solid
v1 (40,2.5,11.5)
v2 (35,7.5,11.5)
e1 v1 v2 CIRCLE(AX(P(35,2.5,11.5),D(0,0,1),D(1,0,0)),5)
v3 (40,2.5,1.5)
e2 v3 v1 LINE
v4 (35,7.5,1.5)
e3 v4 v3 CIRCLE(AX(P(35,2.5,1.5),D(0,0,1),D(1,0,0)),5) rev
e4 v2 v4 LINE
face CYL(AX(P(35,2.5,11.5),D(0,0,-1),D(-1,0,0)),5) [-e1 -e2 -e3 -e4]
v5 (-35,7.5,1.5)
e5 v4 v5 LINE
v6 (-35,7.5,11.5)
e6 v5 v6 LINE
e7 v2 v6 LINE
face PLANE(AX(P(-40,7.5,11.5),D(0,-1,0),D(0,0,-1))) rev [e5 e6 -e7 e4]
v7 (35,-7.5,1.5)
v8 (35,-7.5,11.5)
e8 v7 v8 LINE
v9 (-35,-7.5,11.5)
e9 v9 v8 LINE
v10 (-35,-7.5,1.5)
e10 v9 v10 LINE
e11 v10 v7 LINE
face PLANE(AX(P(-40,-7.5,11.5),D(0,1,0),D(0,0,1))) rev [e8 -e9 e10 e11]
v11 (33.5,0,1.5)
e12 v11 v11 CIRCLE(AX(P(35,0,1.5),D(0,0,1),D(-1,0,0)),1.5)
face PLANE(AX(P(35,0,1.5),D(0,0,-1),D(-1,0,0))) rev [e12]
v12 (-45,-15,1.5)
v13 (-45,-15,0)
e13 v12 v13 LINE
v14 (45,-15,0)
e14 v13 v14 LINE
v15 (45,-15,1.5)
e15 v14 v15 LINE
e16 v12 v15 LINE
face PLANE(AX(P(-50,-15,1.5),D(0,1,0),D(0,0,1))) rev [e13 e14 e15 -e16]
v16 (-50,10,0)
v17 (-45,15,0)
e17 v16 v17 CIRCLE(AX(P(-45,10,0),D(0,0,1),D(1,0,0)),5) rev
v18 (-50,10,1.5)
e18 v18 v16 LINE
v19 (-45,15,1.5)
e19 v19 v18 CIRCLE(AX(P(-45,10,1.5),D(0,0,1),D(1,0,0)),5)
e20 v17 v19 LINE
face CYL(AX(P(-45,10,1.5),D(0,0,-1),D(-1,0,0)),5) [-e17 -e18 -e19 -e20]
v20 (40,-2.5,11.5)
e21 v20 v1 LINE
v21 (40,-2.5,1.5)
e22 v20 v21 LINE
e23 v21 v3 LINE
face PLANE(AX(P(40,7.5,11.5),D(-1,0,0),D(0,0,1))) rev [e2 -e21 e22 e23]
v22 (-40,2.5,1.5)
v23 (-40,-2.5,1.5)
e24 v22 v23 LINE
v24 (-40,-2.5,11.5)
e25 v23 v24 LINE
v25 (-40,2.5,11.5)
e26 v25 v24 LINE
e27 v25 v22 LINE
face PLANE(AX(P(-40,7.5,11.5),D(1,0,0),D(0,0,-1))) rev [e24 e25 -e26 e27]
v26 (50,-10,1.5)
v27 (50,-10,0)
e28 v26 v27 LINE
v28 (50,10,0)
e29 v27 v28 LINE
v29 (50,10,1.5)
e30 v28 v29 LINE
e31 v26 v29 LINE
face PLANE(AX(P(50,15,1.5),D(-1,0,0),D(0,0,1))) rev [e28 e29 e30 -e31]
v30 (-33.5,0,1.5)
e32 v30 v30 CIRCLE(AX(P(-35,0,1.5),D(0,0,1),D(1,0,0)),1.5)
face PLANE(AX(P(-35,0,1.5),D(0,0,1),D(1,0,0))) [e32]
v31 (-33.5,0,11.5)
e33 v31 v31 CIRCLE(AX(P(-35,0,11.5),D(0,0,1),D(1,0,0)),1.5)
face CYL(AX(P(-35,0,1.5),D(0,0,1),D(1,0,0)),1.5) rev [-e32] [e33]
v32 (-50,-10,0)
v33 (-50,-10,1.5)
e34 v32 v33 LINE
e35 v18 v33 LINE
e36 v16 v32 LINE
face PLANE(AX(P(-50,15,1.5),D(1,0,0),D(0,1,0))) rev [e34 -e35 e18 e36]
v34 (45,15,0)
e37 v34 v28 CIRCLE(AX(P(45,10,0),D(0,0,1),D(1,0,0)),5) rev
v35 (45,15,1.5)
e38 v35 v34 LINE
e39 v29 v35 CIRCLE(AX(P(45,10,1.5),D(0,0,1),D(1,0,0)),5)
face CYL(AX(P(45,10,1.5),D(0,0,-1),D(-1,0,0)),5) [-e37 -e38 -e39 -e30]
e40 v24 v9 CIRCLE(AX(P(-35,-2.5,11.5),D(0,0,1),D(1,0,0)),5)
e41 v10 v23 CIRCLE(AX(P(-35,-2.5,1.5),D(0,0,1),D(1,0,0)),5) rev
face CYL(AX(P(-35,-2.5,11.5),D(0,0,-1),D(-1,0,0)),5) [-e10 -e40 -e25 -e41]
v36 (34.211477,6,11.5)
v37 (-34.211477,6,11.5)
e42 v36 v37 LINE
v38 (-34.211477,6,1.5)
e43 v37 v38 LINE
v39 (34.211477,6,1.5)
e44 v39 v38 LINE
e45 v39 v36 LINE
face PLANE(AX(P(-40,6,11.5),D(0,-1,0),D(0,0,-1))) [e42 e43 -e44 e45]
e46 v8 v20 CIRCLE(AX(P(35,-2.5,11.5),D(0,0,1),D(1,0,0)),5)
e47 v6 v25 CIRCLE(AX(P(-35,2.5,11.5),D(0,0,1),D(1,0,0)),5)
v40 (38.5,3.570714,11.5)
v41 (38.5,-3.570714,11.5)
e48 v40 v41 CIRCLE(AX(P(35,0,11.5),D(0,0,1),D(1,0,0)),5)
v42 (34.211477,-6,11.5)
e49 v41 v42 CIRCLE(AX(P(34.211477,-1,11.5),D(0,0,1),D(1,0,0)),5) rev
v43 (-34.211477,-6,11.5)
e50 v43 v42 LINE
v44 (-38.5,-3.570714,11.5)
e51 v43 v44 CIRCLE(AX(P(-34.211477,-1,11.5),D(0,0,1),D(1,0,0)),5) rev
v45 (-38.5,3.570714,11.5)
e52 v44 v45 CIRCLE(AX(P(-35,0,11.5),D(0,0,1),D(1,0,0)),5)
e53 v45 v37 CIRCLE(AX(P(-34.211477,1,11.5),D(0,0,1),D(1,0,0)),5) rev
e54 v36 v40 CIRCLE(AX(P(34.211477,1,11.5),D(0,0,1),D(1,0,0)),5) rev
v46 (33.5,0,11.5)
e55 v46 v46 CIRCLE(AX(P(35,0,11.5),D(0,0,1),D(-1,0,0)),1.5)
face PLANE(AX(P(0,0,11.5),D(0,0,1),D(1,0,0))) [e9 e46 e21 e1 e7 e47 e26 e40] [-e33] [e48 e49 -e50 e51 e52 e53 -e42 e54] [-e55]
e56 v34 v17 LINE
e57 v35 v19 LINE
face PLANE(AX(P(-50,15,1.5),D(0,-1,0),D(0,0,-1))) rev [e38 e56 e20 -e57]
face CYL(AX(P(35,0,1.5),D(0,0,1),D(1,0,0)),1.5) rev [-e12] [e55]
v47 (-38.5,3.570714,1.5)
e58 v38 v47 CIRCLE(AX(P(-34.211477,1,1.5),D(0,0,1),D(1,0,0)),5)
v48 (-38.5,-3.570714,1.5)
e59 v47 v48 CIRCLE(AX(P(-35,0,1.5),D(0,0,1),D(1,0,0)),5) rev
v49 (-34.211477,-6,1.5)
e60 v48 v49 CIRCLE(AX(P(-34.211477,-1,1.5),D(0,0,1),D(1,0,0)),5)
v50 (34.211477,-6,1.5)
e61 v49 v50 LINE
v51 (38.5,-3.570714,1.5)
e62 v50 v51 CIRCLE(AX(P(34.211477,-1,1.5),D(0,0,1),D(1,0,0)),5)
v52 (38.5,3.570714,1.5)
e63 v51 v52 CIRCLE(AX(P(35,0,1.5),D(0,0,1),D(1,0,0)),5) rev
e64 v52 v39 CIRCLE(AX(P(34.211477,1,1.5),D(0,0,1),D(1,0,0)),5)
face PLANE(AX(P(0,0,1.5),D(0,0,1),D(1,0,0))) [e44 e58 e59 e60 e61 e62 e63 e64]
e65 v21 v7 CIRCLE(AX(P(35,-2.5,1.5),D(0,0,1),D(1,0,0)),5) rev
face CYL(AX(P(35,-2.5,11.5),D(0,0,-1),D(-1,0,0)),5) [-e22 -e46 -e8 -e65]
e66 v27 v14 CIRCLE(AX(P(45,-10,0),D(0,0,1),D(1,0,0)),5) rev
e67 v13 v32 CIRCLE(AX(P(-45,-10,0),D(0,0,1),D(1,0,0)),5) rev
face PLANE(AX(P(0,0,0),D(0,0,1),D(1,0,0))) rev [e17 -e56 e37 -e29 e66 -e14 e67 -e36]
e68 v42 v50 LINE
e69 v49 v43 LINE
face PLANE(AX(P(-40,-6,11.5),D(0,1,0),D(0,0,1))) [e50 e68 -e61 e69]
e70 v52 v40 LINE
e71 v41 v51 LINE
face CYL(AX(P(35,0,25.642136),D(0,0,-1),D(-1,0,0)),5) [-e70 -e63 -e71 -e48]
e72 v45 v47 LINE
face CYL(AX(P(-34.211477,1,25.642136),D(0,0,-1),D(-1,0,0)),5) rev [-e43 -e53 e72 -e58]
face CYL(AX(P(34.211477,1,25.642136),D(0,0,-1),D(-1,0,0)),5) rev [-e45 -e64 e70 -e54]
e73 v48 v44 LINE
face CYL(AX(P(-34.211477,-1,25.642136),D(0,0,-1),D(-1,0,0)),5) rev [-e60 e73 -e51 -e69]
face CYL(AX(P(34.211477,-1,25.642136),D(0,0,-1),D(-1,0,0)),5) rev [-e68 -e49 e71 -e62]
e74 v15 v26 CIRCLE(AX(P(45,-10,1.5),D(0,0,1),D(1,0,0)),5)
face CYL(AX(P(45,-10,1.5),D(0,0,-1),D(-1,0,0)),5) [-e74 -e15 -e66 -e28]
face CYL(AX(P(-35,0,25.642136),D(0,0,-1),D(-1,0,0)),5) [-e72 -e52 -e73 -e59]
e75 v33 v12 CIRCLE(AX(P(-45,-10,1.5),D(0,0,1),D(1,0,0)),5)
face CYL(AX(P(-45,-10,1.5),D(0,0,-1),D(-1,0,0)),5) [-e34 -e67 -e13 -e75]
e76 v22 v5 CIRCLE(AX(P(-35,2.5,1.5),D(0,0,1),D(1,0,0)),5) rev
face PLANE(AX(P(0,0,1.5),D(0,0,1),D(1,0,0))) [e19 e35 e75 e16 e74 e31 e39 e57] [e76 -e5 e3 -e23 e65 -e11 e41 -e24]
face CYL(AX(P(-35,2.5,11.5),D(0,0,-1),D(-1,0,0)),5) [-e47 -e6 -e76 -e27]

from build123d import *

# Parameters (mm, degrees)
SKETCH1_W           = 100
SKETCH1_H           = 30
BOSS_EXTRUDE1_DEPTH = 1.5
SKETCH2_W           = 80
SKETCH2_H           = 15
SKETCH2_W_2         = 77
SKETCH2_H_2         = 12
EXTRUDE_THIN1_DEPTH = 10
SKETCH3_R           = 5
BOSS_EXTRUDE2_DEPTH = 10
SKETCH4_R           = 1.5
CUT_EXTRUDE1_DEPTH  = 10
FILLET1_R           = 5


with BuildPart() as part:
    # Sketch1 → Boss-Extrude1 (new body)
    with BuildSketch(Plane.XY):
        Rectangle(SKETCH1_W, SKETCH1_H)
    extrude(amount=BOSS_EXTRUDE1_DEPTH)

    # Sketch2 → Extrude-Thin1 (add)
    with BuildSketch(Plane.XY.offset(1.5)):
        Rectangle(SKETCH2_W, SKETCH2_H)
        Rectangle(SKETCH2_W_2, SKETCH2_H_2, mode=Mode.SUBTRACT)
    extrude(amount=EXTRUDE_THIN1_DEPTH)

    # Sketch3 → Boss-Extrude2 (add)
    with BuildSketch(Plane.XY.offset(1.5)):
        with Locations((-35, 0)):
            Circle(SKETCH3_R)
        with Locations((35, 0)):
            Circle(SKETCH3_R)
    extrude(amount=BOSS_EXTRUDE2_DEPTH)

    # Sketch4 → Cut-Extrude1 (cut)
    with BuildSketch(Plane.XY.offset(11.5)):
        with Locations((-35, 0)):
            Circle(SKETCH4_R)
        with Locations(Location((35, 0, 0), (0, 0, 180))):
            Circle(SKETCH4_R)
    extrude(amount=-CUT_EXTRUDE1_DEPTH, mode=Mode.SUBTRACT)

    # Fillet1
    # the kernel refuses this fillet: 5 mm, written as the material it adds along each edge
    with BuildSketch(Plane(origin=(38.5, -6, 1.5), x_dir=(0, 1, 0), z_dir=(0, 0, 1))) as fillet1_piece_1:
        with BuildLine():
            CenterArc((5, 4.288522873), FILLET1_R, 180, 59.059821395)
            Line((0, 4.288522873), (0, 0))
            Line((0, 0), (2.429285786, 0))
        make_face()
    extrude(amount=10)
    with BuildSketch(Plane(origin=(38.5, 6, 1.5), x_dir=(0, -1, 0), z_dir=(0, 0, 1))) as fillet1_piece_2:
        with BuildLine():
            CenterArc((5, -4.288522873), FILLET1_R, 120.940178605, 59.059821395)
            Line((0, -4.288522873), (0, 0))
            Line((0, 0), (2.429285786, 0))
        make_face()
    extrude(amount=10)
    with BuildSketch(Plane(origin=(-38.5, -6, 1.5), x_dir=(1, 0, 0), z_dir=(0, 0, 1))) as fillet1_piece_3:
        with BuildLine():
            CenterArc((4.288522873, 5), FILLET1_R, 210.940178605, 59.059821395)
            Line((0, 2.429285786), (0, 0))
            Line((0, 0), (4.288522873, 0))
        make_face()
    extrude(amount=10)
    with BuildSketch(Plane(origin=(-38.5, 6, 1.5), x_dir=(1, 0, 0), z_dir=(0, 0, 1))) as fillet1_piece_4:
        with BuildLine():
            CenterArc((4.288522873, -5), FILLET1_R, 90, 59.059821395)
            Line((0, -2.429285786), (0, 0))
            Line((0, 0), (4.288522873, 0))
        make_face()
    extrude(amount=10)
    # the kernel refuses this fillet: 5 mm, written as the material it takes off along each edge
    with BuildSketch(Plane(origin=(40, 7.5, 1.5), x_dir=(0, -1, 0), z_dir=(0, 0, 1)), Plane(origin=(40, -7.5, 1.5), x_dir=(-1, 0, 0), z_dir=(0, 0, 1)), Plane(origin=(-40, 7.5, 1.5), x_dir=(1, 0, 0), z_dir=(0, 0, 1))) as fillet1_2_piece_1:
        with BuildLine():
            CenterArc((FILLET1_R, -FILLET1_R), FILLET1_R, 90, 90)
            Line((0, -FILLET1_R), (0, 0))
            Line((0, 0), (FILLET1_R, 0))
        make_face()
    extrude(amount=22.5, mode=Mode.SUBTRACT)
    with BuildSketch(Plane(origin=(-40, -7.5, 1.5), x_dir=(1, 0, 0), z_dir=(0, 0, 1))) as fillet1_2_piece_2:
        with BuildLine():
            CenterArc((FILLET1_R, FILLET1_R), FILLET1_R, 180, 90)
            Line((0, FILLET1_R), (0, 0))
            Line((0, 0), (FILLET1_R, 0))
        make_face()
    extrude(amount=22.5, mode=Mode.SUBTRACT)
    with BuildSketch(Plane(origin=(-50, 15, -12.5), x_dir=(1, 0, 0), z_dir=(0, 0, 1)), Plane(origin=(-50, -15, -12.5), x_dir=(0, 1, 0), z_dir=(0, 0, 1))) as fillet1_2_piece_3:
        with BuildLine():
            CenterArc((FILLET1_R, -FILLET1_R), FILLET1_R, 90, 90)
            Line((0, -FILLET1_R), (0, 0))
            Line((0, 0), (FILLET1_R, 0))
        make_face()
    extrude(amount=26.5, mode=Mode.SUBTRACT)
    with BuildSketch(Plane(origin=(50, -15, -12.5), x_dir=(0, 1, 0), z_dir=(0, 0, 1)), Plane(origin=(50, 15, -12.5), x_dir=(-1, 0, 0), z_dir=(0, 0, 1))) as fillet1_2_piece_4:
        with BuildLine():
            CenterArc((FILLET1_R, FILLET1_R), FILLET1_R, 180, 90)
            Line((0, FILLET1_R), (0, 0))
            Line((0, 0), (FILLET1_R, 0))
        make_face()
    extrude(amount=26.5, mode=Mode.SUBTRACT)


solid = part.part
